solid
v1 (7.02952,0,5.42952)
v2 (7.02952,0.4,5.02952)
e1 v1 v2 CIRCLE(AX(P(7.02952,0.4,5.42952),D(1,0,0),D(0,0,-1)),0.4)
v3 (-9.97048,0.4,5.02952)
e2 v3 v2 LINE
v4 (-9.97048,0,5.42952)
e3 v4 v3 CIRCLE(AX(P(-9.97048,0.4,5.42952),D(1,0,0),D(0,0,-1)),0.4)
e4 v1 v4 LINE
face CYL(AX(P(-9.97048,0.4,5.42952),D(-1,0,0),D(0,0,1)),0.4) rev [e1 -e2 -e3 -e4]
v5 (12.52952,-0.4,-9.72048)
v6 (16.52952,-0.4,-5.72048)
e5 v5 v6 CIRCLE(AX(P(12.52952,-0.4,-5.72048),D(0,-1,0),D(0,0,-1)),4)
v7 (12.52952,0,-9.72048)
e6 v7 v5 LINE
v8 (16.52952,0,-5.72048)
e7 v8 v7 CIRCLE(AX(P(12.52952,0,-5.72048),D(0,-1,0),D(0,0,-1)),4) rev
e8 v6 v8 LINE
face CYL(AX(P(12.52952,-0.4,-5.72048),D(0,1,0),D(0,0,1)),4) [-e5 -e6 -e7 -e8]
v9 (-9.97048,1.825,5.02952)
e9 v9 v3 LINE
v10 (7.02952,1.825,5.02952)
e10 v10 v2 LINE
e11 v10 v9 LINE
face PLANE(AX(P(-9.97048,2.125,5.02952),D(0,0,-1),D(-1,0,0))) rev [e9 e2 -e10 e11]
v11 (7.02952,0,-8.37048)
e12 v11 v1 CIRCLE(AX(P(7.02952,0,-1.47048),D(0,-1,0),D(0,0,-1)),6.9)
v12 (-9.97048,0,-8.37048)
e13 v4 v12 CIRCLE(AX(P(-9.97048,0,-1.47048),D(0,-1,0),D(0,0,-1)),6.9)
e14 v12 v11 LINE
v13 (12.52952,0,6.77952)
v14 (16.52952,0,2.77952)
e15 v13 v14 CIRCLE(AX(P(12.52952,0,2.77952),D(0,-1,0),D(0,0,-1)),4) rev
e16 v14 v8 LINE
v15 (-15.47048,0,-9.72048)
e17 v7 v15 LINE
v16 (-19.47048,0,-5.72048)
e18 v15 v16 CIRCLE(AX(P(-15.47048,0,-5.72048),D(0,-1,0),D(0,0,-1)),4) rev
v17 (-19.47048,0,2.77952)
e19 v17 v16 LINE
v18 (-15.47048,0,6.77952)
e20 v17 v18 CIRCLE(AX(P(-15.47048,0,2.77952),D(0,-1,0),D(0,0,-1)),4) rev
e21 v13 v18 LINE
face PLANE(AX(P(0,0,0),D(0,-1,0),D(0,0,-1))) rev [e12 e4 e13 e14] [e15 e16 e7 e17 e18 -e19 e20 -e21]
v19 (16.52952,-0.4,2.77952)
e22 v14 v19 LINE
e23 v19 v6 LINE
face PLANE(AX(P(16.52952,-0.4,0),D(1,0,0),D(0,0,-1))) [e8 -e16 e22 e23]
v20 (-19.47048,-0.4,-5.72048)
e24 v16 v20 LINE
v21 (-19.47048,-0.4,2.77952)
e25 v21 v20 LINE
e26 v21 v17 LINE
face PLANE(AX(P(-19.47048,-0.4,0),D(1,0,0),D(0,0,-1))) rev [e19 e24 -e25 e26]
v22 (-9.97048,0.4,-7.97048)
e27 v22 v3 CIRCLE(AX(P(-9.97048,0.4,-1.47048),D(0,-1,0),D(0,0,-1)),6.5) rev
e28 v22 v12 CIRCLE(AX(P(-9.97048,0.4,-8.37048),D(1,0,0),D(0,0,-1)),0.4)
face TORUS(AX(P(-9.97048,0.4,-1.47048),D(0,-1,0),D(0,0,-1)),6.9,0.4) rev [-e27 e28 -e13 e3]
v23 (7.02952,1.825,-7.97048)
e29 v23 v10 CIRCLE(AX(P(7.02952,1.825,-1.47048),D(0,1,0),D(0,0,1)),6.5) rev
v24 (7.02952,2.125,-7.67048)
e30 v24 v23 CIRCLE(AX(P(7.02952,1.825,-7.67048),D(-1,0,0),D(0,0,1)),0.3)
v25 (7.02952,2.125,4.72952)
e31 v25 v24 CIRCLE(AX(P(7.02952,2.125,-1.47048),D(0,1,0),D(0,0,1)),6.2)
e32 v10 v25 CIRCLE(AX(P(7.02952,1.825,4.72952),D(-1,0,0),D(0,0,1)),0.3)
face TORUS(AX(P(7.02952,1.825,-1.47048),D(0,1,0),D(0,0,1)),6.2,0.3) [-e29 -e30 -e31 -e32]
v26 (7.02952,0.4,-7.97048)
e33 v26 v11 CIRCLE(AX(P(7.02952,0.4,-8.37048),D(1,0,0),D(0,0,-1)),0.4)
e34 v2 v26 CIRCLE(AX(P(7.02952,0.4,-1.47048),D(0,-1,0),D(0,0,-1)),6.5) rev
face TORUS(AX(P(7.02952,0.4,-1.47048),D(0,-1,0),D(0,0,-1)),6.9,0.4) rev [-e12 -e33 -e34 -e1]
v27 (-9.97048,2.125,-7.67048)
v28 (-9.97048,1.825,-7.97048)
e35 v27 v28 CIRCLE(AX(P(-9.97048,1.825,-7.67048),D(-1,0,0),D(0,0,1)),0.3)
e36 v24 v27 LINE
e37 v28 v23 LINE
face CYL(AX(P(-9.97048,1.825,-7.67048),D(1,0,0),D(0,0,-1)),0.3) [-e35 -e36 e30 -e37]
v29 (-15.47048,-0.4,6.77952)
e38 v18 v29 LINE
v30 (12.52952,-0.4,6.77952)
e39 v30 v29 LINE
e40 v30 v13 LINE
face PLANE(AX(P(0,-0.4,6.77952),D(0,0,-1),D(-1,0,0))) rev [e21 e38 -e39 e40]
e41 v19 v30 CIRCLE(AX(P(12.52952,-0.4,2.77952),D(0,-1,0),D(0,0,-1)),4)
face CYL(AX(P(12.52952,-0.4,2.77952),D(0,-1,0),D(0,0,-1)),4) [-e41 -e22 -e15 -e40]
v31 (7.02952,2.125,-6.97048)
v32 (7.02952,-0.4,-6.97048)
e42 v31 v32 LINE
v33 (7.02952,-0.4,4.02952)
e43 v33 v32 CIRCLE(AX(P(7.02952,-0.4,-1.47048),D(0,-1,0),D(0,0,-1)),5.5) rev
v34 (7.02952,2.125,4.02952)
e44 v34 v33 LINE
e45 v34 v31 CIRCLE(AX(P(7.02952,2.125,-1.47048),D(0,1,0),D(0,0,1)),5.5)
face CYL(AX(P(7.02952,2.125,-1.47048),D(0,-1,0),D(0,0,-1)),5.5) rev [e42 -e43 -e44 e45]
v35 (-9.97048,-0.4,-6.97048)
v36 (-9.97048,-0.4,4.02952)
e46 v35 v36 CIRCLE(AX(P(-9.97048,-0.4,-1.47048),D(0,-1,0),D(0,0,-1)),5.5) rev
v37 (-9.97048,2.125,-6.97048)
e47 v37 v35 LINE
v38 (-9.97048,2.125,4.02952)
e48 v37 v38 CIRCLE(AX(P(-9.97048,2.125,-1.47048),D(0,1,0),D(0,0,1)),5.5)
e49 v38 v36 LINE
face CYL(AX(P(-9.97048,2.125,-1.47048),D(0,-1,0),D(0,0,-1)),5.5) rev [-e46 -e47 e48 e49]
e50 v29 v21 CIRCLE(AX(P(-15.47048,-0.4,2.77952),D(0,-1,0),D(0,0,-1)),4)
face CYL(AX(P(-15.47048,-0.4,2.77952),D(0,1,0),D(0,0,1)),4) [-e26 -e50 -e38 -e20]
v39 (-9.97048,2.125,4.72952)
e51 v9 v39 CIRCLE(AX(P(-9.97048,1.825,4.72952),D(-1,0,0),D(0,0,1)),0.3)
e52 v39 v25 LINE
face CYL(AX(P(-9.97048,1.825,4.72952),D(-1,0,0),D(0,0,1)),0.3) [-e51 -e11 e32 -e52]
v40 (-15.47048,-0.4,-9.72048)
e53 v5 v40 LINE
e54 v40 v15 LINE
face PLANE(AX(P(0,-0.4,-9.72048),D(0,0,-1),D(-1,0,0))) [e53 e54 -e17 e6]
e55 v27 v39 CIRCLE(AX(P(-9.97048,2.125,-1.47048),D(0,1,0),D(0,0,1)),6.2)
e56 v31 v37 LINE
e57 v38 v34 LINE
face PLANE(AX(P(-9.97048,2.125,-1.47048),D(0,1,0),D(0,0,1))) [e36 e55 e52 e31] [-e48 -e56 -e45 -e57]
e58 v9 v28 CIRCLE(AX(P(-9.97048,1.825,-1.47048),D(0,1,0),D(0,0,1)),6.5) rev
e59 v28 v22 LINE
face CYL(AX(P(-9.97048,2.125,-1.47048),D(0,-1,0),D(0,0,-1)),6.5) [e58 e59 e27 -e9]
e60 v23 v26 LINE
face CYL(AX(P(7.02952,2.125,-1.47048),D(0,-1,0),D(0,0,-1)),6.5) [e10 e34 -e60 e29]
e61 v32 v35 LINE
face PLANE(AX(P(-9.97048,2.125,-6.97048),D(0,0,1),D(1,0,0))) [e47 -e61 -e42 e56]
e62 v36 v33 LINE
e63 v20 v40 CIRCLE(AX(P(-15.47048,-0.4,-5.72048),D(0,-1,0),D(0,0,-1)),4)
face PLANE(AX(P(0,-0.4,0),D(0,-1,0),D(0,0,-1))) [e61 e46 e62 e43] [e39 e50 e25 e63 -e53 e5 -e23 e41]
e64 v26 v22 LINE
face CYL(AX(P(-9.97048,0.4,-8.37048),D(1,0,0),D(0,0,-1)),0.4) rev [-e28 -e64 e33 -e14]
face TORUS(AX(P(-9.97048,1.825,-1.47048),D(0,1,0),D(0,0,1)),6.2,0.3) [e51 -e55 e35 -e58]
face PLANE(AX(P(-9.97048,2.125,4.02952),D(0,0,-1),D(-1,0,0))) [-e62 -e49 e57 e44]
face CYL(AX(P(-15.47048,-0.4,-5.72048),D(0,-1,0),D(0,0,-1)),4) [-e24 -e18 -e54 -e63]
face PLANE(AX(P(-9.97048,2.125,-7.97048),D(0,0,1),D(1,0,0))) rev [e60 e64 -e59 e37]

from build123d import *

# Parameters (mm, degrees)
BOSS_EXTRUDE1_DEPTH     = 2.125
BOSS_EXTRUDE3_START     = -0.4
BOSS_EXTRUDE3_OUTLINE_W = 36
BOSS_EXTRUDE3_OUTLINE_H = 16.5
BOSS_EXTRUDE3_DEPTH     = 0.4
FILLET1_R               = 4
FILLET2_R               = 4
FILLET3_R               = 0.3
FILLET4_R               = 0.4


# Read off the part's stored shape, not the designer's step: Boss-Extrude3
with BuildPart() as part:
    # Sketch1 → Boss-Extrude1 (new body)
    with BuildSketch(Plane(origin=(0, 0, 0), x_dir=(1, 0, 0), z_dir=(0, 1, 0))):
        with BuildLine():
            Line((-9.970479705, 7.970479705), (7.029520295, 7.970479705))
            ThreePointArc((7.029520295, 7.970479705), (13.529520295, 1.470479705), (7.029520295, -5.029520295))
            Line((7.029520295, -5.029520295), (-9.970479705, -5.029520295))
            ThreePointArc((-9.970479705, -5.029520295), (-16.470479705, 1.470479705), (-9.970479705, 7.970479705))
        make_face()
        with BuildLine():
            Line((-9.970479705, 6.970479705), (7.029520295, 6.970479705))
            ThreePointArc((7.029520295, 6.970479705), (12.529520295, 1.470479705), (7.029520295, -4.029520295))
            Line((7.029520295, -4.029520295), (-9.970479705, -4.029520295))
            ThreePointArc((-9.970479705, -4.029520295), (-15.470479705, 1.470479705), (-9.970479705, 6.970479705))
        make_face(mode=Mode.SUBTRACT)
    extrude(amount=BOSS_EXTRUDE1_DEPTH)

    # Boss-Extrude3 outline → Boss-Extrude3 (add)
    with BuildSketch(Plane(origin=(0, 0, 0), x_dir=(1, 0, 0), z_dir=(0, 1, 0)).offset(BOSS_EXTRUDE3_START)):
        with Locations((-1.470479705, 1.470479705)):
            Rectangle(BOSS_EXTRUDE3_OUTLINE_W, BOSS_EXTRUDE3_OUTLINE_H)
        with BuildLine():
            Line((7.029520295, -4.029520295), (-9.970479705, -4.029520295))
            ThreePointArc((-9.970479705, -4.029520295), (-15.470479705, 1.470479705), (-9.970479705, 6.970479705))
            Line((-9.970479705, 6.970479705), (7.029520295, 6.970479705))
            ThreePointArc((7.029520295, 6.970479705), (12.529520295, 1.470479705), (7.029520295, -4.029520295))
        make_face(mode=Mode.SUBTRACT)
    extrude(amount=BOSS_EXTRUDE3_DEPTH)

    # Fillet1
    fillet1_edges = [part.edges().sort_by_distance(p)[0] for p in [
        (-19.470479705, -0.2, 6.779520295),
    ]]
    fillet(fillet1_edges, radius=FILLET1_R)

    # Fillet2
    fillet2_edges = [part.edges().sort_by_distance(p)[0] for p in [
        (16.529520295, -0.2, 6.779520295),
        (-19.470479705, -0.2, -9.720479705),
        (16.529520295, -0.2, -9.720479705),
    ]]
    fillet(fillet2_edges, radius=FILLET2_R)

    # Fillet3
    fillet3_edges = [part.edges().sort_by_distance(p)[0] for p in [
        (13.529520295, 2.125, -1.470479705),
        (-1.470479705, 2.125, -7.970479705),
        (-16.470479705, 2.125, -1.470479705),
        (-1.470479705, 2.125, 5.029520295),
    ]]
    fillet(fillet3_edges, radius=FILLET3_R)

    # Fillet4
    fillet4_edges = [part.edges().sort_by_distance(p)[0] for p in [
        (-1.470479705, 0, -7.970479705),
        (13.529520295, 0, -1.470479705),
        (-1.470479705, 0, 5.029520295),
        (-16.470479705, 0, -1.470479705),
    ]]
    fillet(fillet4_edges, radius=FILLET4_R)


solid = part.part
